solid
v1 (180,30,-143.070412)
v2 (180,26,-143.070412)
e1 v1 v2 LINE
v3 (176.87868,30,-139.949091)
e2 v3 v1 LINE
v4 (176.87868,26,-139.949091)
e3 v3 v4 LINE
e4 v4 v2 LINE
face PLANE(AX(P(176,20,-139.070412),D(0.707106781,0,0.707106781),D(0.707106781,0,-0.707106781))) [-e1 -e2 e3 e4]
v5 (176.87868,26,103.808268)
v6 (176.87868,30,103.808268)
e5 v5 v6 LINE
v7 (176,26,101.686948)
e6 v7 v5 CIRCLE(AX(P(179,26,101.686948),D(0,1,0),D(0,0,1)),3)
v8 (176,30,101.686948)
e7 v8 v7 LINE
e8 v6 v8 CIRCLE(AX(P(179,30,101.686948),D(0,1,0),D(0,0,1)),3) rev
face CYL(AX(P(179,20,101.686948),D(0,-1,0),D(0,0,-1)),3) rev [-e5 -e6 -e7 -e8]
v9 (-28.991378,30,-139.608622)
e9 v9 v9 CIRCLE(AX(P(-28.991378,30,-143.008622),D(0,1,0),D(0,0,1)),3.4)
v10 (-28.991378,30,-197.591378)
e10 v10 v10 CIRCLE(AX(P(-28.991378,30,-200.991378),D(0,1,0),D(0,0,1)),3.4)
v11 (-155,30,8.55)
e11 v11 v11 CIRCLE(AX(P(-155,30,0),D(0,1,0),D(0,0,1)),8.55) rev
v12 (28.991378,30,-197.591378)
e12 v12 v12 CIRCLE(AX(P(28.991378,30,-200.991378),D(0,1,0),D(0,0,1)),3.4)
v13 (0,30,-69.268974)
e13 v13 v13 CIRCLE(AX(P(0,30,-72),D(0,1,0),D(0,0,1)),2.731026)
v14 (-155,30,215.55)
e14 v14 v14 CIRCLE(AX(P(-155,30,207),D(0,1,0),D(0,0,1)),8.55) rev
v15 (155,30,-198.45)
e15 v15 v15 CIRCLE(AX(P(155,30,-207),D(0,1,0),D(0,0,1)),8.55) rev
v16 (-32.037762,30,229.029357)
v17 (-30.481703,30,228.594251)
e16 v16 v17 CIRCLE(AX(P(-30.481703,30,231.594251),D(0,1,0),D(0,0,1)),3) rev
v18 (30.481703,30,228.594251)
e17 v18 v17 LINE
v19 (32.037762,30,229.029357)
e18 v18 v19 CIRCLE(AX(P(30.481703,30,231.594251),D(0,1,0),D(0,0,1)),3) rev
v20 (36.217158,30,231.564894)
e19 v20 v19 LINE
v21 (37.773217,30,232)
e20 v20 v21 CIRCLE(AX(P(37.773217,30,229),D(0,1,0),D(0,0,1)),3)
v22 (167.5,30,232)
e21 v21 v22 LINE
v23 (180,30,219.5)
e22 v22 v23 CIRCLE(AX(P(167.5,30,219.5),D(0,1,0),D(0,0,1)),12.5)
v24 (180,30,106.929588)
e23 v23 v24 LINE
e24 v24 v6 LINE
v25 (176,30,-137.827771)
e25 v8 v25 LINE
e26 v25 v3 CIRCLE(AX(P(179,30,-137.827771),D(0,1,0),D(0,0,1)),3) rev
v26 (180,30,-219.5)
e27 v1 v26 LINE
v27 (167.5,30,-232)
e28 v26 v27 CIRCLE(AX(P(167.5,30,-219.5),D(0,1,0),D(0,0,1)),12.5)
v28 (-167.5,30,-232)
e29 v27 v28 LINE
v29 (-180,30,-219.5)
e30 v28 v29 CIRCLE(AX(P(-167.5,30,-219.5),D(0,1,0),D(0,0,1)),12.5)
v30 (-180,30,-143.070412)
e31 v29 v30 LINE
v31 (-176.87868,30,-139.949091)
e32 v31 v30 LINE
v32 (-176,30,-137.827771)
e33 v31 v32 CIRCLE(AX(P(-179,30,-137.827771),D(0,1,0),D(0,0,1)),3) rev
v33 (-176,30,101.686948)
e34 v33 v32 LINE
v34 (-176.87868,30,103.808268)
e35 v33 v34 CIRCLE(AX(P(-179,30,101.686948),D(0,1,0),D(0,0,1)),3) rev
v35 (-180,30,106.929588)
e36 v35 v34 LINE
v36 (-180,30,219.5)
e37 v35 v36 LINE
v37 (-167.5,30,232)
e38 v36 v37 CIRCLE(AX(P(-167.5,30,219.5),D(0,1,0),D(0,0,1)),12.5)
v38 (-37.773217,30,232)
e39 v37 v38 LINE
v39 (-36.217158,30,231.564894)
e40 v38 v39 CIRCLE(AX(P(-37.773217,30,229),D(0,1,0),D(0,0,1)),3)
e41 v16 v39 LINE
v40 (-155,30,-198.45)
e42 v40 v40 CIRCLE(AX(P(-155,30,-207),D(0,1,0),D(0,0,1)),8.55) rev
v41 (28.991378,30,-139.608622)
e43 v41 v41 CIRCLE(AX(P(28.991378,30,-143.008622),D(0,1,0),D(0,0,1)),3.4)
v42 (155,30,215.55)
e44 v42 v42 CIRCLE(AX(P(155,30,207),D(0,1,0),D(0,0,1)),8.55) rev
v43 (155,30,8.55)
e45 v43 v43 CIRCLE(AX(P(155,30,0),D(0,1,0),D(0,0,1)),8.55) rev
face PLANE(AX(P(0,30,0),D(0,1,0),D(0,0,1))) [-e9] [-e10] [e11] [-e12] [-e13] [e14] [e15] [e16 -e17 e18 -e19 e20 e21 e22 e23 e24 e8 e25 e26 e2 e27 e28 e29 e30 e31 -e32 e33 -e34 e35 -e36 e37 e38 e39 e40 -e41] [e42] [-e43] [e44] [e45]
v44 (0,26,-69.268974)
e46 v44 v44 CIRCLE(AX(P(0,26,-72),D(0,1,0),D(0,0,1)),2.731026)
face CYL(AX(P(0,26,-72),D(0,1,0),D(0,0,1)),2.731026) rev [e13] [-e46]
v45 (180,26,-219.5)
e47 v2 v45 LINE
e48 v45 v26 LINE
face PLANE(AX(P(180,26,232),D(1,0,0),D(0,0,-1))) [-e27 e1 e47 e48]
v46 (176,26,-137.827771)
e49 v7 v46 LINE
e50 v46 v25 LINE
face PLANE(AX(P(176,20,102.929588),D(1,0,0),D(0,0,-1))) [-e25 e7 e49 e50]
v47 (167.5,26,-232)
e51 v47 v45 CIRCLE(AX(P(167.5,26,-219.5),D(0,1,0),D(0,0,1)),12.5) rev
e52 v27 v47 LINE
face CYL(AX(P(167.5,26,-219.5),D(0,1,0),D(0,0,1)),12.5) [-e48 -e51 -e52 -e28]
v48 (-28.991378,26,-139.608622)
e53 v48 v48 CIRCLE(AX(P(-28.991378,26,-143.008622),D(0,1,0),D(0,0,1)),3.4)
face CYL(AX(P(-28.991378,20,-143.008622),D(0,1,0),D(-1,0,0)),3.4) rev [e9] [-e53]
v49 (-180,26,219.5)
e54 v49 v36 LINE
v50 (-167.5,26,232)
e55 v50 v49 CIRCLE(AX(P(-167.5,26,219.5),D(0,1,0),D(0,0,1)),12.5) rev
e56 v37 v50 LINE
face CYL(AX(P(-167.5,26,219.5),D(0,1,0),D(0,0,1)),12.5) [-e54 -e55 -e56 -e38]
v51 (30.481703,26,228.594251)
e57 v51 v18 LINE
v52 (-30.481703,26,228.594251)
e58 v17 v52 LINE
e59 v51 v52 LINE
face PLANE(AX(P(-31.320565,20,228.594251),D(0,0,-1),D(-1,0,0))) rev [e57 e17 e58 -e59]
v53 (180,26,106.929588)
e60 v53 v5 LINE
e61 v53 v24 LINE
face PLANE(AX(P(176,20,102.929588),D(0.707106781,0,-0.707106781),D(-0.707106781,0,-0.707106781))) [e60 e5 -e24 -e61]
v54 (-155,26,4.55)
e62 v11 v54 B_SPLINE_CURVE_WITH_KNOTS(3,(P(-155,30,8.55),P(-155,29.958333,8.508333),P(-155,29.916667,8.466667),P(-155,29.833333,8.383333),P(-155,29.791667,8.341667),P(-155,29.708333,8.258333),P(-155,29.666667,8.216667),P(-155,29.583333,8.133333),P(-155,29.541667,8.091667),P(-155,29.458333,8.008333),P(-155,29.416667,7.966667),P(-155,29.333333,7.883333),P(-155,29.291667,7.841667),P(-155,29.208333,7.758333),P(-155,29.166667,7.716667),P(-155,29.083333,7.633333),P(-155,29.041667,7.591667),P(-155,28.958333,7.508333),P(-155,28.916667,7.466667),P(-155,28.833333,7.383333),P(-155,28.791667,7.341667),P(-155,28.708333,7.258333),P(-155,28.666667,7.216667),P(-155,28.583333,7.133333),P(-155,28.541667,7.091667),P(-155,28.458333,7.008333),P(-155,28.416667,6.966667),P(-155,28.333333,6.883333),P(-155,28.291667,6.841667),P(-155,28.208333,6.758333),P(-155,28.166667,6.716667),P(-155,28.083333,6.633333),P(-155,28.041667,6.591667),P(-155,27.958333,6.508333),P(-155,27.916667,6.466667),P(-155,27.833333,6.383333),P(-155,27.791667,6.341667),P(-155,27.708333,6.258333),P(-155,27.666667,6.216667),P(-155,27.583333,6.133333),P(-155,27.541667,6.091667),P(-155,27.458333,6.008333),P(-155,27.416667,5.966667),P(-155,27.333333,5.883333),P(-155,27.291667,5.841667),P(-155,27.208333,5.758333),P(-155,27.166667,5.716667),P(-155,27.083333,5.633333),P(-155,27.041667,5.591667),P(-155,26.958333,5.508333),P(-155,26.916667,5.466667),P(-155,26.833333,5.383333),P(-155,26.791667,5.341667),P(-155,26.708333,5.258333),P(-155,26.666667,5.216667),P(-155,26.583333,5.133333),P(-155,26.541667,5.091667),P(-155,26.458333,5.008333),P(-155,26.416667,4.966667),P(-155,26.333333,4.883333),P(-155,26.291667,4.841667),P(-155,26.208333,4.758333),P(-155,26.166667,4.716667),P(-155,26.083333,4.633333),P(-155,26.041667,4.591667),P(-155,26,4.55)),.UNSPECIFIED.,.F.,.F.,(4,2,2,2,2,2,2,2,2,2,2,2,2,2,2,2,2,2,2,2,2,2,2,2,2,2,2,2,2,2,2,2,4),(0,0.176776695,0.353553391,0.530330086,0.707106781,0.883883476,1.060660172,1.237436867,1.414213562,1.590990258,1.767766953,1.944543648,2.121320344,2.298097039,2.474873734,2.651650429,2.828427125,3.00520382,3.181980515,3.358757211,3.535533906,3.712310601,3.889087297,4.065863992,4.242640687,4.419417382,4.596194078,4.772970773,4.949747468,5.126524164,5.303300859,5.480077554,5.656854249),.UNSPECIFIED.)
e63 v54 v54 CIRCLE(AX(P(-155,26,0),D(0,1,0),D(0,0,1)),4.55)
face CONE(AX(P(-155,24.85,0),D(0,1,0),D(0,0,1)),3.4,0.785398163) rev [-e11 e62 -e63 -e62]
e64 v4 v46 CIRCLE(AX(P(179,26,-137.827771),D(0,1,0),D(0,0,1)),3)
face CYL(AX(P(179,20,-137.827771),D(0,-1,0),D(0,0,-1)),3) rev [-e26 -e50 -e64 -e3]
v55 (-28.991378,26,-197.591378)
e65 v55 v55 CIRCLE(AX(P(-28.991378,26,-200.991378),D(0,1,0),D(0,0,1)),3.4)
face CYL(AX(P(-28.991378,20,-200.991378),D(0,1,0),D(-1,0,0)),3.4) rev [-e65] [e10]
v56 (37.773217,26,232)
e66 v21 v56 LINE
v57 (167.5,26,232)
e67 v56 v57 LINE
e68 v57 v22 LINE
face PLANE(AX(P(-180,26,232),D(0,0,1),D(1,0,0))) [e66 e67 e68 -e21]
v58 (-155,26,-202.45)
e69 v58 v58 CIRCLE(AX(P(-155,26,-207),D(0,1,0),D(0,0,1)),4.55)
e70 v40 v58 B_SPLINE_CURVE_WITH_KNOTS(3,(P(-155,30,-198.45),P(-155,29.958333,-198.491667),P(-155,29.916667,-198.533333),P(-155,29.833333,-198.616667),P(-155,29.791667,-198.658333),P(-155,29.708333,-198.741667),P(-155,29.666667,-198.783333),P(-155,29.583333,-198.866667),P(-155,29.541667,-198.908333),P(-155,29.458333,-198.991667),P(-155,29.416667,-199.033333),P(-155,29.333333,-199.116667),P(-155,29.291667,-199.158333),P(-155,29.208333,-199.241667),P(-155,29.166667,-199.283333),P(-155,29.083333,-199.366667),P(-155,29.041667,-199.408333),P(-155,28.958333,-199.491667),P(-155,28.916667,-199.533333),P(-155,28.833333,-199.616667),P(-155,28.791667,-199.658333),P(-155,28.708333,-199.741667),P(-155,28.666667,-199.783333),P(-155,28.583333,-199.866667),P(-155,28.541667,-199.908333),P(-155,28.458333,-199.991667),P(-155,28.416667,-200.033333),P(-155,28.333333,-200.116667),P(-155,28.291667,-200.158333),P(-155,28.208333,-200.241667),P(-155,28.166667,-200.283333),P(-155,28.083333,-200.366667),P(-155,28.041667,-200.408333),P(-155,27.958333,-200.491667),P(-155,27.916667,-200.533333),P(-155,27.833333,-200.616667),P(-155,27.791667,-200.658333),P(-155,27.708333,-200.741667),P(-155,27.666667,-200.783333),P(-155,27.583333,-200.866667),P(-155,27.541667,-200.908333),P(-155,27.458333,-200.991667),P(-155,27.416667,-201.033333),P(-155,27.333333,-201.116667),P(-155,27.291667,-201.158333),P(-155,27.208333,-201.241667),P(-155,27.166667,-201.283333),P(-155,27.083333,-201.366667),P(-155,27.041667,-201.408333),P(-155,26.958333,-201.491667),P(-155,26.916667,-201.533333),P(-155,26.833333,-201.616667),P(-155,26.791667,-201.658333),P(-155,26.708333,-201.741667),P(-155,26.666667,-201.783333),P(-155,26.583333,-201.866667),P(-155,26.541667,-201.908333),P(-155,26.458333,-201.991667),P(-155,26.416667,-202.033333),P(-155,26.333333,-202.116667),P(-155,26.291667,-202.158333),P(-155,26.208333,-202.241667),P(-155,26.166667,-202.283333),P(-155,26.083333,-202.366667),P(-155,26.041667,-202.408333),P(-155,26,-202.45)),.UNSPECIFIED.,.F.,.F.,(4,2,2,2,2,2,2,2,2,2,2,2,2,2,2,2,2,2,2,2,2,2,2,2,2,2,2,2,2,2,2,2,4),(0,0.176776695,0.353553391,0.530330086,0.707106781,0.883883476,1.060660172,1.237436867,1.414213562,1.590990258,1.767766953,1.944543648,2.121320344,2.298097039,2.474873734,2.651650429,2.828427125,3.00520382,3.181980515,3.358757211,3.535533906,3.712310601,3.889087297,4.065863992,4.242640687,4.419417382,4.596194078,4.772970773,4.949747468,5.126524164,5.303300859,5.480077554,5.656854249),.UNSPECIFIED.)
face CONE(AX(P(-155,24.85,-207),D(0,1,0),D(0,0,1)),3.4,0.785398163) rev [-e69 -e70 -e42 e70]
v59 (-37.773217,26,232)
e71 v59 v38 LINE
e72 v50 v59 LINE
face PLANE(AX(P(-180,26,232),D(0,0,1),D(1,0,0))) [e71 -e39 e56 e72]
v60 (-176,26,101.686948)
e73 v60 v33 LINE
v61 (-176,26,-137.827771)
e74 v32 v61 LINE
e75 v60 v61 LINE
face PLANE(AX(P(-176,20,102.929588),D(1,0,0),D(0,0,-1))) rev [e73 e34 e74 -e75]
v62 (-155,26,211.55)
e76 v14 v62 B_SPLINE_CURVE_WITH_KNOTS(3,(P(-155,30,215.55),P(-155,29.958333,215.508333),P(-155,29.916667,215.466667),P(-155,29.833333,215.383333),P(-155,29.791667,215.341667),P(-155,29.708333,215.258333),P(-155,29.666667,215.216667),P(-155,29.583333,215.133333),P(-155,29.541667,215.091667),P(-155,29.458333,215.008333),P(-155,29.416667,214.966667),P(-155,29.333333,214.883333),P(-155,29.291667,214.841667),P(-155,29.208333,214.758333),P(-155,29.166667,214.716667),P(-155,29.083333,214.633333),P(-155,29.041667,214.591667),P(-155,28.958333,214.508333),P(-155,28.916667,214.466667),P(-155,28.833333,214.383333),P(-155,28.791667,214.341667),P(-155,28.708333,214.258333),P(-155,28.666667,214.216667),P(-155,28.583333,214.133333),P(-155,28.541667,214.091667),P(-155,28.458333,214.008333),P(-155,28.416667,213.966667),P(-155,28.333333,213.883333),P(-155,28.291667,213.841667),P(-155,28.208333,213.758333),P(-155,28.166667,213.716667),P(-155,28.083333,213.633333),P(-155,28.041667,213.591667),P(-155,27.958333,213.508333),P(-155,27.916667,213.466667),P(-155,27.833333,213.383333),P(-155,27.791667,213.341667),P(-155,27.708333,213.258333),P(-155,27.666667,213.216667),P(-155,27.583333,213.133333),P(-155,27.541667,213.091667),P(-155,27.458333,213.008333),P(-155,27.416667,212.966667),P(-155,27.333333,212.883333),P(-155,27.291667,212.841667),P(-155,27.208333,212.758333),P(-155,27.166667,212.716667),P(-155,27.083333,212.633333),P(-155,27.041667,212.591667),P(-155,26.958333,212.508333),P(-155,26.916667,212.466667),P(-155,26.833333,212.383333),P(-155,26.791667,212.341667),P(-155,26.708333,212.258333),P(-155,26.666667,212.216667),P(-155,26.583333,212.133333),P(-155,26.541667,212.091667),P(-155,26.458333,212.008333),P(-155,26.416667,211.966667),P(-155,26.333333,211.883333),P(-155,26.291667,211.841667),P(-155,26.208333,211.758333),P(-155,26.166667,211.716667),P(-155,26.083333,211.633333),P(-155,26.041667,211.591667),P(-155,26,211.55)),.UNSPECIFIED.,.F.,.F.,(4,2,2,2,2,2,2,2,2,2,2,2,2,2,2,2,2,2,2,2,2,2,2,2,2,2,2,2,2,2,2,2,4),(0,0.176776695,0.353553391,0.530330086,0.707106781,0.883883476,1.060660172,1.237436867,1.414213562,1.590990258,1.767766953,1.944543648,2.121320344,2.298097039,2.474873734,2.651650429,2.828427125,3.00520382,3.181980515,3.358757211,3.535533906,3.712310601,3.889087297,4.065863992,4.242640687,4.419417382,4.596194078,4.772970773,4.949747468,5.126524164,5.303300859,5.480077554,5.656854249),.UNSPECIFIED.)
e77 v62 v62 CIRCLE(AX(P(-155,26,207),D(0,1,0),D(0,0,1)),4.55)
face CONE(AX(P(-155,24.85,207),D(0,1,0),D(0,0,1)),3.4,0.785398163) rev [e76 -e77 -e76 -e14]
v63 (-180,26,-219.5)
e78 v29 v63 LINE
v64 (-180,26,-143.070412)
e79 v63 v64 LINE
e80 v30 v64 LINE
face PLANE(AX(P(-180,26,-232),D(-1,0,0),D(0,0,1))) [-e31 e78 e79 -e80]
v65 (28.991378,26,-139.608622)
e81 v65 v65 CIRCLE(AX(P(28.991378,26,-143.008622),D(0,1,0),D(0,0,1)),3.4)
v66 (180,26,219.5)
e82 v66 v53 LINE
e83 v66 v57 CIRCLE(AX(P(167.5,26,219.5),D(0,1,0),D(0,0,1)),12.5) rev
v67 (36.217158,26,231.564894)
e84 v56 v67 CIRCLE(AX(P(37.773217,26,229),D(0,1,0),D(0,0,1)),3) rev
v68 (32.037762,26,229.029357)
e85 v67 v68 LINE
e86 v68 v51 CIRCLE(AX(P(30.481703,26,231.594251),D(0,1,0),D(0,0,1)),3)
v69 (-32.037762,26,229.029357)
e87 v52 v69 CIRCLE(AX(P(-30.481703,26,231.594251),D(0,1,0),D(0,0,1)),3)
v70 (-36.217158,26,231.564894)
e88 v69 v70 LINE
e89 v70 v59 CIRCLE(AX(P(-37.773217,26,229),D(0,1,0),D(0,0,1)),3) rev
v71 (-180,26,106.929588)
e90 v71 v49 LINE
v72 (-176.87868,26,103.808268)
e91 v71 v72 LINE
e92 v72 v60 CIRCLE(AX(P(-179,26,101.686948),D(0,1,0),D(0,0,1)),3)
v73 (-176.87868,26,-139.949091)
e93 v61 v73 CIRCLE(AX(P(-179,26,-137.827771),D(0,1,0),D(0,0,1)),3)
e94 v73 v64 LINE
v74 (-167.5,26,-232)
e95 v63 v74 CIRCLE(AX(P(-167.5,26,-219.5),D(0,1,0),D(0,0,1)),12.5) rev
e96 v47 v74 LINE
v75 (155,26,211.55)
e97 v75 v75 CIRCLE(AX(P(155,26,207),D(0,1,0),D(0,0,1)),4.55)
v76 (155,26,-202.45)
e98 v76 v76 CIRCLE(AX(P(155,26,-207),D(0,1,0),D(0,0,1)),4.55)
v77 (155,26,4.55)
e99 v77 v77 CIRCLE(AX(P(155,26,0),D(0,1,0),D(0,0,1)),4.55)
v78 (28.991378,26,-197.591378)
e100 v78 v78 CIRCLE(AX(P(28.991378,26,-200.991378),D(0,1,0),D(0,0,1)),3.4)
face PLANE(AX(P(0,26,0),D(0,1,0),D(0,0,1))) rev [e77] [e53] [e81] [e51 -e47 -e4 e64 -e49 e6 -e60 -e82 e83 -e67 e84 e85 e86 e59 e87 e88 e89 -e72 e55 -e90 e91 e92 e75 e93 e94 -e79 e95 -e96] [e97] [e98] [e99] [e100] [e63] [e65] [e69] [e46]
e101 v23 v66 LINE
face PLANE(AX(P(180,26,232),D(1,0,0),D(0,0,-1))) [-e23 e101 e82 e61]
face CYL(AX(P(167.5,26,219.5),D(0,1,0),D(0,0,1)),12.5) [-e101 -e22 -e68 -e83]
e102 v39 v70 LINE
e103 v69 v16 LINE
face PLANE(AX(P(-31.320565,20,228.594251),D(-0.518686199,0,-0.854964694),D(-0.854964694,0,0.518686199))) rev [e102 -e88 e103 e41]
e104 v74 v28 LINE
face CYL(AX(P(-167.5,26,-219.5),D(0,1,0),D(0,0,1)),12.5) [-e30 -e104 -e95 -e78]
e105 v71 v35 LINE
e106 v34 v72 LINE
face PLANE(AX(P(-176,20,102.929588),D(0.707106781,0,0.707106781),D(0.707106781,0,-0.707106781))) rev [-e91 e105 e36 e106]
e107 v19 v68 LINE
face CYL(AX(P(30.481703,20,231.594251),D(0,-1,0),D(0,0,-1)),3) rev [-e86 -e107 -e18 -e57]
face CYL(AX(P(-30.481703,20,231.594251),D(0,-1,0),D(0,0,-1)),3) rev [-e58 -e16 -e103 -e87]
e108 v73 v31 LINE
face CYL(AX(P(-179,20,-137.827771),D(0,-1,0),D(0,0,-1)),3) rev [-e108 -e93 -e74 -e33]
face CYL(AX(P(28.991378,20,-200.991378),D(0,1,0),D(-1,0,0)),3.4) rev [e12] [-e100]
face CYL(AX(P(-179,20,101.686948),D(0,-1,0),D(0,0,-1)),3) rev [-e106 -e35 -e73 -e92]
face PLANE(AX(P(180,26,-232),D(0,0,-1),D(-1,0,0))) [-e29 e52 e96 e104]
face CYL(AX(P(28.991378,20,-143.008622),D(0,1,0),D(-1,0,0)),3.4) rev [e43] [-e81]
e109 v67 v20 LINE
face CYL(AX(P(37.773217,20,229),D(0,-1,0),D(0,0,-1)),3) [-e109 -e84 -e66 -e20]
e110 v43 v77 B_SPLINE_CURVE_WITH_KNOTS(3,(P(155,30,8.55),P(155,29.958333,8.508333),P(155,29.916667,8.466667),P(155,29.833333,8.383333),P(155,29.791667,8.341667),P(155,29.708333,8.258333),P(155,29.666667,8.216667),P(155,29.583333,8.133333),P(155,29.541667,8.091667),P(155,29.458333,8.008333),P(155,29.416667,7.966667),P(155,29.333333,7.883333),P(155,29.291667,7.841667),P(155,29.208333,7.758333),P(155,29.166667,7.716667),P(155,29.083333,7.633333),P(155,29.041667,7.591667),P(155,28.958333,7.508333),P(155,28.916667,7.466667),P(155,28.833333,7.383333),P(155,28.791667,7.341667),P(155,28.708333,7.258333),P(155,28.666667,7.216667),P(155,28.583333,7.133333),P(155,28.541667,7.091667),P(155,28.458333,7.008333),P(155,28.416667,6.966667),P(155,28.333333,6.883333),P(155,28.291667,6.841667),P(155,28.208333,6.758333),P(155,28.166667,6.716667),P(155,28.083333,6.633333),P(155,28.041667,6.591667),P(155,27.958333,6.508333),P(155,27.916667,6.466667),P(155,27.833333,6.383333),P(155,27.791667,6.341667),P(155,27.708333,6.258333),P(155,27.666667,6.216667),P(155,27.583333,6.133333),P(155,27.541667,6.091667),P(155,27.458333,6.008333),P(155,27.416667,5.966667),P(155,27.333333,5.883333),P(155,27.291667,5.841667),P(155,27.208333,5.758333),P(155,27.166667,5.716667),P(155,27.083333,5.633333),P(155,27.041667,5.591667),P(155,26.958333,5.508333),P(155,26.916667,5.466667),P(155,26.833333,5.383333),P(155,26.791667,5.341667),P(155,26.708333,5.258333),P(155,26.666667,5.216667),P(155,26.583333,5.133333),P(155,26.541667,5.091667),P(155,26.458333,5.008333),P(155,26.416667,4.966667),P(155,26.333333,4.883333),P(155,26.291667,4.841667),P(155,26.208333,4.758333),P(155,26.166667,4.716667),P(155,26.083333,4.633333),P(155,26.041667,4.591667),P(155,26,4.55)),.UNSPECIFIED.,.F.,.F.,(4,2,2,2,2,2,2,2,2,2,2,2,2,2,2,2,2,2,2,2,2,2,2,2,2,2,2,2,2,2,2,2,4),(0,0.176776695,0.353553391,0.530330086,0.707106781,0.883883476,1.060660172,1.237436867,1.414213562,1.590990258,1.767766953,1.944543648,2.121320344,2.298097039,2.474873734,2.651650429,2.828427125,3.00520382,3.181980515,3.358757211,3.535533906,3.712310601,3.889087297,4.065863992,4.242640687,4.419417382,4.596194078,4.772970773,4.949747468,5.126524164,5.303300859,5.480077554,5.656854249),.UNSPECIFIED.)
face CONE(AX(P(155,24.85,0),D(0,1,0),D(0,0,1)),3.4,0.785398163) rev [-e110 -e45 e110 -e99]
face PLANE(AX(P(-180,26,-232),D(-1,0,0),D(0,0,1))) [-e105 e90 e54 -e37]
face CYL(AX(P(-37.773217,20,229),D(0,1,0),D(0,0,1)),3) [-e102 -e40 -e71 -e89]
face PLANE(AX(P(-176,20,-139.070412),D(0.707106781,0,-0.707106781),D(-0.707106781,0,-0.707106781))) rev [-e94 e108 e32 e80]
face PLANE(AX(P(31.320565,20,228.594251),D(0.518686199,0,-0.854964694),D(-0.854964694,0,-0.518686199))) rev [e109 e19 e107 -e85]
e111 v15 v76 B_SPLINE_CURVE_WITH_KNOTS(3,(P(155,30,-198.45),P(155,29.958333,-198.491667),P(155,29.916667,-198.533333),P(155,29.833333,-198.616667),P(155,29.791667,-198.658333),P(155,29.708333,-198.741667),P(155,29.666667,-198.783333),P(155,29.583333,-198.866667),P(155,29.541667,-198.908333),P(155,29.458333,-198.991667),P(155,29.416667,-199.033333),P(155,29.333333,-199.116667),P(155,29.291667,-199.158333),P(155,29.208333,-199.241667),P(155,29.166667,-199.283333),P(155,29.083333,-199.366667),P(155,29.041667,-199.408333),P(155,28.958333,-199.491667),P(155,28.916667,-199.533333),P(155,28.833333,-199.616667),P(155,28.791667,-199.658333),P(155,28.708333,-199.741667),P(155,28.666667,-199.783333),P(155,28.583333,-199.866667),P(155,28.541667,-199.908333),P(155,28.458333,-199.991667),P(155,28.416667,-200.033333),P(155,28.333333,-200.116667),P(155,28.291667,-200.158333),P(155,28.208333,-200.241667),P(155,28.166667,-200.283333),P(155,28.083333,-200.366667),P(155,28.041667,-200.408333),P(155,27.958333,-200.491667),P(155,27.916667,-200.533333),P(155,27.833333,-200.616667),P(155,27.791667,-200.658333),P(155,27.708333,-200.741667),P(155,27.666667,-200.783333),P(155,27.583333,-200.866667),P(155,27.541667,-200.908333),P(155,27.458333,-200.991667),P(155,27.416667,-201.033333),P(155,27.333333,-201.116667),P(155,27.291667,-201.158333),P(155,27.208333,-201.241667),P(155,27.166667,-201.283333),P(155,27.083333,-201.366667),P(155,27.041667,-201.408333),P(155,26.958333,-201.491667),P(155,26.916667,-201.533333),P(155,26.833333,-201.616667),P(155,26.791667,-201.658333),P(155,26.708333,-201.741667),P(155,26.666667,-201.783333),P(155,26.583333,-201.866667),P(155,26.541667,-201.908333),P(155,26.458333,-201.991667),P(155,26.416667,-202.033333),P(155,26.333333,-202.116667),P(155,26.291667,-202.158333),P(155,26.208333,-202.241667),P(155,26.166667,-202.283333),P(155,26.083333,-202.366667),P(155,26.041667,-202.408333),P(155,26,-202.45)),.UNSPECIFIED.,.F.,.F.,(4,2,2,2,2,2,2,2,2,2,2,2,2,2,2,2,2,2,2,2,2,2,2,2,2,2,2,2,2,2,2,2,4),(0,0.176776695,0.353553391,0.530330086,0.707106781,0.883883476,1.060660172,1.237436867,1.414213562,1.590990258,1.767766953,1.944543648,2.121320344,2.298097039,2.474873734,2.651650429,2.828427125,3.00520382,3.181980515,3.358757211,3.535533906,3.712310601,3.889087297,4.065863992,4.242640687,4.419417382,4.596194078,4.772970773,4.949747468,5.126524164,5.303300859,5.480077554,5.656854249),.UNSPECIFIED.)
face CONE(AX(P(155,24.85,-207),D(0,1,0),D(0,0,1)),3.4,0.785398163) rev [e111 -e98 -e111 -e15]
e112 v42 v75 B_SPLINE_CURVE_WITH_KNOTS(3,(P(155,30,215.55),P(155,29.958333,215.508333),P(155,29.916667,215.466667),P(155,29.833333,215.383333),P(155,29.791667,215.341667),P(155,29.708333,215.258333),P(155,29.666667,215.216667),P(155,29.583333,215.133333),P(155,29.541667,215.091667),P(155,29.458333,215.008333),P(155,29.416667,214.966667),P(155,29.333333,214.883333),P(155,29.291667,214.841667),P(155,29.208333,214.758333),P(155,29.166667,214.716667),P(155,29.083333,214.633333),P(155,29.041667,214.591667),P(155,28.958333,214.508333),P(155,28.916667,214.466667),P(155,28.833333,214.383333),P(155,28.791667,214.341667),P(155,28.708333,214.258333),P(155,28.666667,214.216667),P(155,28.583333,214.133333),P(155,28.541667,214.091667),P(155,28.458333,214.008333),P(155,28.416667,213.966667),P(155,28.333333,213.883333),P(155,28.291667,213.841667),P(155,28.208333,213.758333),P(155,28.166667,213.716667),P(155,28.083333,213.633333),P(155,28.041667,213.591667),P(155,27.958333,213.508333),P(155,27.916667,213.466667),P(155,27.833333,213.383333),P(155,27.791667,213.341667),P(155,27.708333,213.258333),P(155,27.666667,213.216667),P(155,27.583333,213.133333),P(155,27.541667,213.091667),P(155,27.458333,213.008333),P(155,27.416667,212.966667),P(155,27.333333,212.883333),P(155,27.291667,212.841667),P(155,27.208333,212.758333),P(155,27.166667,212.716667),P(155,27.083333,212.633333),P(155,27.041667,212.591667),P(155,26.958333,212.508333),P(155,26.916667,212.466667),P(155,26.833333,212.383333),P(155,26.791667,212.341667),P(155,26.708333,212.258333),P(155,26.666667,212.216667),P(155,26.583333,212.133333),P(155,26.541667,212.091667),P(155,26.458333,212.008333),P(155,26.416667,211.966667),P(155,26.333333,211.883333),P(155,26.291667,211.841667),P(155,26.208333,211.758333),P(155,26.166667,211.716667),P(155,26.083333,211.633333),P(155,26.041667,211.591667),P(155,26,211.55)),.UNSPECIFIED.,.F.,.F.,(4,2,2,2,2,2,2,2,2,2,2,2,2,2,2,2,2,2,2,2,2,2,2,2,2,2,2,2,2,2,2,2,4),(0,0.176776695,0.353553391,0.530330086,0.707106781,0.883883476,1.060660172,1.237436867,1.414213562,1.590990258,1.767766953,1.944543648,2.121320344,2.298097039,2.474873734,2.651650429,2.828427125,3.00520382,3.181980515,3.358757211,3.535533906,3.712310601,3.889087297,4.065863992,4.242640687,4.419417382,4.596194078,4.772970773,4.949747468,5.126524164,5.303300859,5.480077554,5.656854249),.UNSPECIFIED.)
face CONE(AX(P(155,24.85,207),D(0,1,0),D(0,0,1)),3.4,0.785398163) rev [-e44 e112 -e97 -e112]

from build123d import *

# Parameters (mm, degrees)
SKETCH1_W           = 360
SKETCH1_H           = 464
SKETCH1_R           = 3.4
SKETCH1_R_2         = 2.731026391
BOSS_EXTRUDE1_DEPTH = 4
FILLET1_R           = 12.5
SKETCH5_R           = 3.4
CUT_EXTRUDE4_DEPTH  = 20
CUT_EXTRUDE5_DEPTH  = 10
CUT_EXTRUDE6_DEPTH  = 10
FILLET2_R           = 3
CHAMFER1_SIZE       = 5.15


with BuildPart() as part:
    # Sketch1 → Boss-Extrude1 (new body)
    with BuildSketch(Plane(origin=(0, 30, 0), x_dir=(1, 0, 0), z_dir=(0, 1, 0))):
        Rectangle(SKETCH1_W, SKETCH1_H)
        with Locations(Location((-155, 207, 0), (0, 0, 270))):
            Circle(SKETCH1_R, mode=Mode.SUBTRACT)
        with Locations(Location((155, 207, 0), (0, 0, 90))):
            Circle(SKETCH1_R, mode=Mode.SUBTRACT)
        with Locations(Location((-155, -207, 0), (0, 0, 270))):
            Circle(SKETCH1_R, mode=Mode.SUBTRACT)
        with Locations(Location((155, -207, 0), (0, 0, 90))):
            Circle(SKETCH1_R, mode=Mode.SUBTRACT)
        with Locations(Location((-155, 0, 0), (0, 0, 270))):
            Circle(SKETCH1_R, mode=Mode.SUBTRACT)
        with Locations(Location((155, 0, 0), (0, 0, 90))):
            Circle(SKETCH1_R, mode=Mode.SUBTRACT)
        with Locations(Location((0, 72, 0), (0, 0, 270))):
            Circle(SKETCH1_R_2, mode=Mode.SUBTRACT)
    extrude(amount=-BOSS_EXTRUDE1_DEPTH)

    # Fillet1
    fillet1_edges = [part.edges().sort_by_distance(p)[0] for p in [
        (180, 28, -232),
        (180, 28, 232),
        (-180, 28, 232),
        (-180, 28, -232),
    ]]
    fillet(fillet1_edges, radius=FILLET1_R)

    # Sketch5 → Cut-Extrude4 (cut)
    with BuildSketch(Plane(origin=(0, 40, 377.333920735), x_dir=(0, 0, 1), z_dir=(0, 1, 0))):
        with Locations((-520.342542706, 28.991378029)):
            Circle(SKETCH5_R)
        with Locations((-520.342542706, -28.991378029)):
            Circle(SKETCH5_R)
        with Locations((-578.325298763, -28.991378029)):
            Circle(SKETCH5_R)
        with Locations((-578.325298763, 28.991378029)):
            Circle(SKETCH5_R)
    extrude(amount=-CUT_EXTRUDE4_DEPTH, mode=Mode.SUBTRACT)

    # Sketch6 → Cut-Extrude5 (cut)
    with BuildSketch(Plane(origin=(0, 30, 0), x_dir=(1, 0, 0), z_dir=(0, 1, 0))):
        Polygon((-176, -102.929588377), (-176, 139.070411623), (-188.727922061, 151.798333685), (-188.727922061, -115.657510438), align=None)
    cut_extrude5 = extrude(amount=-CUT_EXTRUDE5_DEPTH, mode=Mode.SUBTRACT)

    # Sketch7 → Cut-Extrude6 (cut)
    with BuildSketch(Plane(origin=(0, 30, 0), x_dir=(1, 0, 0), z_dir=(0, 1, 0))):
        Polygon((-31.320564901, -228.594250629), (31.320564901, -228.594250629), (45, -236.893229805), (-45, -236.893229805), align=None)
    extrude(amount=-CUT_EXTRUDE6_DEPTH, mode=Mode.SUBTRACT)

    # Mirror2: Cut-Extrude5 across plane
    add(cut_extrude5.mirror(Plane(origin=(0, 0, 0), x_dir=(0, 0, 1), z_dir=(1, 0, 0))), mode=Mode.SUBTRACT)

    # Fillet2
    fillet2_edges = [part.edges().sort_by_distance(p)[0] for p in [
        (36.934355042, 28, 232),
        (-36.934355042, 28, 232),
        (-31.320564901, 28, 228.594250629),
        (31.320564901, 28, 228.594250629),
        (176, 28, 102.929588377),
        (176, 28, -139.070411623),
        (-176, 28, -139.070411623),
        (-176, 28, 102.929588377),
    ]]
    fillet(fillet2_edges, radius=FILLET2_R)

    # Chamfer1
    # the kernel refuses this chamfer: 5.15 mm, written as the material it takes off along each edge
    with BuildSketch(Plane(origin=(-155, 30, -207), x_dir=(0, 0, 1), z_dir=(-1, 0, 0))) as chamfer1_piece_1:
        Polygon((3.4 + CHAMFER1_SIZE, 0), (3.4, -CHAMFER1_SIZE), (3.4, 0), align=None)
    revolve(axis=Axis((-155, 30, -207), (0, 1, 0)), mode=Mode.SUBTRACT)
    with BuildSketch(Plane(origin=(155, 30, 207), x_dir=(0, 0, -1), z_dir=(1, 0, 0))) as chamfer1_piece_2:
        Polygon((3.4 + CHAMFER1_SIZE, 0), (3.4, -CHAMFER1_SIZE), (3.4, 0), align=None)
    revolve(axis=Axis((155, 30, 207), (0, 1, 0)), mode=Mode.SUBTRACT)
    with BuildSketch(Plane(origin=(155, 30, 0), x_dir=(0, 0, -1), z_dir=(1, 0, 0))) as chamfer1_piece_3:
        Polygon((3.4 + CHAMFER1_SIZE, 0), (3.4, -CHAMFER1_SIZE), (3.4, 0), align=None)
    revolve(axis=Axis((155, 30, 0), (0, 1, 0)), mode=Mode.SUBTRACT)
    with BuildSketch(Plane(origin=(-155, 30, 207), x_dir=(0, 0, 1), z_dir=(-1, 0, 0))) as chamfer1_piece_4:
        Polygon((3.4 + CHAMFER1_SIZE, 0), (3.4, -CHAMFER1_SIZE), (3.4, 0), align=None)
    revolve(axis=Axis((-155, 30, 207), (0, 1, 0)), mode=Mode.SUBTRACT)
    with BuildSketch(Plane(origin=(-155, 30, 0), x_dir=(0, 0, 1), z_dir=(-1, 0, 0))) as chamfer1_piece_5:
        Polygon((3.4 + CHAMFER1_SIZE, 0), (3.4, -CHAMFER1_SIZE), (3.4, 0), align=None)
    revolve(axis=Axis((-155, 30, 0), (0, 1, 0)), mode=Mode.SUBTRACT)
    with BuildSketch(Plane(origin=(155, 30, -207), x_dir=(0, 0, -1), z_dir=(1, 0, 0))) as chamfer1_piece_6:
        Polygon((3.4 + CHAMFER1_SIZE, 0), (3.4, -CHAMFER1_SIZE), (3.4, 0), align=None)
    revolve(axis=Axis((155, 30, -207), (0, 1, 0)), mode=Mode.SUBTRACT)


solid = part.part
